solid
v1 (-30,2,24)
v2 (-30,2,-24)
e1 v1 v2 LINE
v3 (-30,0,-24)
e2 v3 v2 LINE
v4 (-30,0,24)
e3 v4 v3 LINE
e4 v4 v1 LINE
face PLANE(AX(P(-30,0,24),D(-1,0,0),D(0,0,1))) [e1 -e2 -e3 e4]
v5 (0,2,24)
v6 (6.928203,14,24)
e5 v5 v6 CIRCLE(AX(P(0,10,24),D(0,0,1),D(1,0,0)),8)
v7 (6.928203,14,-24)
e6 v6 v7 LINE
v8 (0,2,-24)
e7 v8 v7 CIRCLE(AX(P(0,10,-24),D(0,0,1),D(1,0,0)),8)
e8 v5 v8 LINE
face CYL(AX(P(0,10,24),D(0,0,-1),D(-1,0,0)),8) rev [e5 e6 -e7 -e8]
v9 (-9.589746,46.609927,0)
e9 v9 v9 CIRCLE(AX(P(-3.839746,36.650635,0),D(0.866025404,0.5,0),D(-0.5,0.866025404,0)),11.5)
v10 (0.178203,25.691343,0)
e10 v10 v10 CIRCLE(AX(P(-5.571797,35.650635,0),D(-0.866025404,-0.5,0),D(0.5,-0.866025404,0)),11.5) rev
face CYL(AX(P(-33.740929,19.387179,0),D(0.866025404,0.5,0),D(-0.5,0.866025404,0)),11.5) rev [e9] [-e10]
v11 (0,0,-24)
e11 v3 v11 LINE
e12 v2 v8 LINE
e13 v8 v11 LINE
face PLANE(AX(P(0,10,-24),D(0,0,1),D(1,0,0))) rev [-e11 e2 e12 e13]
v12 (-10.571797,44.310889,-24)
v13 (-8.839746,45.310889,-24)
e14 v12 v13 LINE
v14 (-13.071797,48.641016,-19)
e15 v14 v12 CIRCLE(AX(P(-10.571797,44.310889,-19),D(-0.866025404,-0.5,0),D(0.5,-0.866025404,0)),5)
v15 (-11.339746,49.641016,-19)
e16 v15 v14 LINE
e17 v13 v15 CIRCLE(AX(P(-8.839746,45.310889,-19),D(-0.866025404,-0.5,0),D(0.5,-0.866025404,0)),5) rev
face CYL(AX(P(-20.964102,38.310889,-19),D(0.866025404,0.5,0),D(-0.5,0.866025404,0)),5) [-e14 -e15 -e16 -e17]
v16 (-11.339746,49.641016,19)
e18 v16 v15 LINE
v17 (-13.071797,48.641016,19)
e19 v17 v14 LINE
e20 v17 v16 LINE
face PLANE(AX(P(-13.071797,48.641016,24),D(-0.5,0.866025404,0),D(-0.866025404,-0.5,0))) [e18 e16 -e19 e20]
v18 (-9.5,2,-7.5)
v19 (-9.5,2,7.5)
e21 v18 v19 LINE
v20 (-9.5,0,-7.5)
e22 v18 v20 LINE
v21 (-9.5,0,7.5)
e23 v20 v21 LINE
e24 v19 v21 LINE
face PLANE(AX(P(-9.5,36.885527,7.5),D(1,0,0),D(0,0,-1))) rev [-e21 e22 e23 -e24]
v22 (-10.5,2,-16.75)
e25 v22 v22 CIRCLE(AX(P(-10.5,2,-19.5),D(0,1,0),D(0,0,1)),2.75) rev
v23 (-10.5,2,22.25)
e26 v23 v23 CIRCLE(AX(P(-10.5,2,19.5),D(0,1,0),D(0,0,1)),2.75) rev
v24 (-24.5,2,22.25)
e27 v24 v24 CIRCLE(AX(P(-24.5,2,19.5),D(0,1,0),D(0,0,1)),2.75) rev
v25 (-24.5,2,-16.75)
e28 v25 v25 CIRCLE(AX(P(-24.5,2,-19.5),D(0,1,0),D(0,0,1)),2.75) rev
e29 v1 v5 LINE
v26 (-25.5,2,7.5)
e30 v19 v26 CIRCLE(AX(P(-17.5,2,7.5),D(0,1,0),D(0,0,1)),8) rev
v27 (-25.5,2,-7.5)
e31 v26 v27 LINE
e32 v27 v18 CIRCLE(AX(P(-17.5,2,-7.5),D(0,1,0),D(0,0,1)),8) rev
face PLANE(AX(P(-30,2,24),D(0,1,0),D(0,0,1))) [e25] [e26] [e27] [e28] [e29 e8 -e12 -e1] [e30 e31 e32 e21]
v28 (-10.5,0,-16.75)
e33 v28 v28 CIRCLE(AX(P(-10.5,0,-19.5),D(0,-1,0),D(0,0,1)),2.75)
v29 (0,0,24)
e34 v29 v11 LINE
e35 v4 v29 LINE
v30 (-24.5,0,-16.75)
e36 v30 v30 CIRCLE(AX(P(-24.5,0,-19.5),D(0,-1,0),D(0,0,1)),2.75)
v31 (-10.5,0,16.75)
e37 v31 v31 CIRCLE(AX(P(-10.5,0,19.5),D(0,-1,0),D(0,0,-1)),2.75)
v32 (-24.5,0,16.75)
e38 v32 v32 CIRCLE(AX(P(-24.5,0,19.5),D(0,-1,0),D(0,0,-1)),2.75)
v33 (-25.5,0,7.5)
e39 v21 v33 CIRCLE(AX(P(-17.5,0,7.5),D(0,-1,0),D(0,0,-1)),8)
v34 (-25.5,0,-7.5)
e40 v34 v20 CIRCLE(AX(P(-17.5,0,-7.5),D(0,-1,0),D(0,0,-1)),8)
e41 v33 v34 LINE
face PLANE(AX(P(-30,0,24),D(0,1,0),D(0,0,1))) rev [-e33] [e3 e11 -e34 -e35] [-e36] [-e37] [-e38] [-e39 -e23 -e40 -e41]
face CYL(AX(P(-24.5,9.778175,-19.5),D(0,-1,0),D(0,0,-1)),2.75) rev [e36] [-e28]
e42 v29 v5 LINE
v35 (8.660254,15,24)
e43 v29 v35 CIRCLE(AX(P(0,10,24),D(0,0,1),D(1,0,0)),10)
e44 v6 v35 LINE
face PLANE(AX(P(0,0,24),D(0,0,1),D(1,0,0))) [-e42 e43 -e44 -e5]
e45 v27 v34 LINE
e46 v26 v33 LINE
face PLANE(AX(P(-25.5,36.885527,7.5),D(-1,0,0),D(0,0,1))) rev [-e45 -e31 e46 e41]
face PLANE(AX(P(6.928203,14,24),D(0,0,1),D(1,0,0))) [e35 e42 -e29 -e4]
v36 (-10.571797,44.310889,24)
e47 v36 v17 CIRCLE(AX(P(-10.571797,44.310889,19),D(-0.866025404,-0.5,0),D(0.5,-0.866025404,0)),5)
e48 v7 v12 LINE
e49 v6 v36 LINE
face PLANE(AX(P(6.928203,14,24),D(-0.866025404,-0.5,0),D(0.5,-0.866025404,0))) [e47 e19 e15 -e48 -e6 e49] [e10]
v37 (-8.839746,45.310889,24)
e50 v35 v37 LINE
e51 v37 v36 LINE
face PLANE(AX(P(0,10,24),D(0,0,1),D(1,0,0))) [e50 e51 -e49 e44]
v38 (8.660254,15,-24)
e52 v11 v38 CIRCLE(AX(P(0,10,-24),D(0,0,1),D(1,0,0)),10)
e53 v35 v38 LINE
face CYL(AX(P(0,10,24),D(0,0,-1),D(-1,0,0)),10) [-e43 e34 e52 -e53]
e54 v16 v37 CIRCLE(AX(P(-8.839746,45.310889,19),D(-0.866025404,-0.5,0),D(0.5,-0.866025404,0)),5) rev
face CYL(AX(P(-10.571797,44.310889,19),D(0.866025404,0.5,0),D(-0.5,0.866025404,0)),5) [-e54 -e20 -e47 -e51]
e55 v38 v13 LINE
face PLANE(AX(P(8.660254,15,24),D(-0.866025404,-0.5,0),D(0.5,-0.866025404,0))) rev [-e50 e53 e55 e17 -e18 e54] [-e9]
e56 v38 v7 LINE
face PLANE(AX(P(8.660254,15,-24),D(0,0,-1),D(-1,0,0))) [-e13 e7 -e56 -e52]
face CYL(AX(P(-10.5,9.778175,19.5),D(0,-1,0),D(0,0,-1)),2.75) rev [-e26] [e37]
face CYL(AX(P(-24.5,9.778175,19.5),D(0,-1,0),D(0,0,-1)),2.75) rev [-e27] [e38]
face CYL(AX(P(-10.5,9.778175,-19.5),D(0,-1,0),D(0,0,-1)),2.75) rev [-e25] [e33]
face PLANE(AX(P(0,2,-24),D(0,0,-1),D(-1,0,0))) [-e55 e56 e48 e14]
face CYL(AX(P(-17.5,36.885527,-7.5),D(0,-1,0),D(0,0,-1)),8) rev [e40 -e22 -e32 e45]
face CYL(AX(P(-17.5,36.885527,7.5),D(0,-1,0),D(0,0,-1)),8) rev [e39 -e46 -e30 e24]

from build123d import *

# Parameters (mm, degrees)
SM_BASE_FLANGE_1_DEPTH = 24
SKETCH_3_R             = 2.75
CUT_EXTRUDE_1_DEPTH    = 2
SKETCH_4_R             = 11.5
CUT_EXTRUDE_2_DEPTH    = 2
FILLET_1_R             = 5
CUT_EXTRUDE_3_DEPTH    = 2


# Sheet-metal steps are written as plain solids
with BuildPart() as part:
    # Sketch 1 → 基体-法兰1 (new, symmetric)
    with BuildSketch(Plane.XY):
        with BuildLine():
            Line((-30, 0), (0, 0))
            ThreePointArc((0, 0), (8.660254038, 5), (8.660254038, 15))
            Line((8.660254038, 15), (-11.339745962, 49.641016151))
            Line((-11.339745962, 49.641016151), (-13.07179677, 48.641016151))
            Line((-13.07179677, 48.641016151), (6.92820323, 14))
            ThreePointArc((6.92820323, 14), (6.92820323, 6), (0, 2))
            Line((0, 2), (-30, 2))
            Line((-30, 2), (-30, 0))
        make_face()
    extrude(amount=SM_BASE_FLANGE_1_DEPTH, both=True)

    # 草图3 → 切除-拉伸1 (cut)
    with BuildSketch(Plane.XZ):
        with Locations(Location((-24.5, 19.5, 0), (0, 0, 270))):
            Circle(SKETCH_3_R)
        with Locations(Location((-10.5, 19.5, 0), (0, 0, 270))):
            Circle(SKETCH_3_R)
        with Locations(Location((-10.5, -19.5, 0), (0, 0, 90))):
            Circle(SKETCH_3_R)
        with Locations(Location((-24.5, -19.5, 0), (0, 0, 90))):
            Circle(SKETCH_3_R)
    extrude(amount=-CUT_EXTRUDE_1_DEPTH, mode=Mode.SUBTRACT)

    # 草图4 → 切除-拉伸2 (cut)
    with BuildSketch(Plane(origin=(12.990381057, 7.5, 0), x_dir=(0, 0, -1), z_dir=(0.8660254037844363, 0.5000000000000041, 0))):
        with Locations(Location((0, 33.660254038, 0), (0, 0, 90))):
            Circle(SKETCH_4_R)
    extrude(amount=-CUT_EXTRUDE_2_DEPTH, mode=Mode.SUBTRACT)

    # 圆角1
    fillet_1_edges = [part.edges().sort_by_distance(p)[0] for p in [
        (-12.205771366, 49.141016151, 24),
        (-12.205771366, 49.141016151, -24),
    ]]
    fillet(fillet_1_edges, radius=FILLET_1_R)

    # 草图5 → 切除-拉伸3 (cut)
    with BuildSketch(Plane.XZ):
        with BuildLine():
            Line((-9.5, 7.5), (-9.5, -7.5))
            ThreePointArc((-9.5, -7.5), (-17.5, -15.5), (-25.5, -7.5))
            Line((-25.5, -7.5), (-25.5, 7.5))
            ThreePointArc((-25.5, 7.5), (-17.5, 15.5), (-9.5, 7.5))
        make_face()
    extrude(amount=-CUT_EXTRUDE_3_DEPTH, mode=Mode.SUBTRACT)


solid = part.part
